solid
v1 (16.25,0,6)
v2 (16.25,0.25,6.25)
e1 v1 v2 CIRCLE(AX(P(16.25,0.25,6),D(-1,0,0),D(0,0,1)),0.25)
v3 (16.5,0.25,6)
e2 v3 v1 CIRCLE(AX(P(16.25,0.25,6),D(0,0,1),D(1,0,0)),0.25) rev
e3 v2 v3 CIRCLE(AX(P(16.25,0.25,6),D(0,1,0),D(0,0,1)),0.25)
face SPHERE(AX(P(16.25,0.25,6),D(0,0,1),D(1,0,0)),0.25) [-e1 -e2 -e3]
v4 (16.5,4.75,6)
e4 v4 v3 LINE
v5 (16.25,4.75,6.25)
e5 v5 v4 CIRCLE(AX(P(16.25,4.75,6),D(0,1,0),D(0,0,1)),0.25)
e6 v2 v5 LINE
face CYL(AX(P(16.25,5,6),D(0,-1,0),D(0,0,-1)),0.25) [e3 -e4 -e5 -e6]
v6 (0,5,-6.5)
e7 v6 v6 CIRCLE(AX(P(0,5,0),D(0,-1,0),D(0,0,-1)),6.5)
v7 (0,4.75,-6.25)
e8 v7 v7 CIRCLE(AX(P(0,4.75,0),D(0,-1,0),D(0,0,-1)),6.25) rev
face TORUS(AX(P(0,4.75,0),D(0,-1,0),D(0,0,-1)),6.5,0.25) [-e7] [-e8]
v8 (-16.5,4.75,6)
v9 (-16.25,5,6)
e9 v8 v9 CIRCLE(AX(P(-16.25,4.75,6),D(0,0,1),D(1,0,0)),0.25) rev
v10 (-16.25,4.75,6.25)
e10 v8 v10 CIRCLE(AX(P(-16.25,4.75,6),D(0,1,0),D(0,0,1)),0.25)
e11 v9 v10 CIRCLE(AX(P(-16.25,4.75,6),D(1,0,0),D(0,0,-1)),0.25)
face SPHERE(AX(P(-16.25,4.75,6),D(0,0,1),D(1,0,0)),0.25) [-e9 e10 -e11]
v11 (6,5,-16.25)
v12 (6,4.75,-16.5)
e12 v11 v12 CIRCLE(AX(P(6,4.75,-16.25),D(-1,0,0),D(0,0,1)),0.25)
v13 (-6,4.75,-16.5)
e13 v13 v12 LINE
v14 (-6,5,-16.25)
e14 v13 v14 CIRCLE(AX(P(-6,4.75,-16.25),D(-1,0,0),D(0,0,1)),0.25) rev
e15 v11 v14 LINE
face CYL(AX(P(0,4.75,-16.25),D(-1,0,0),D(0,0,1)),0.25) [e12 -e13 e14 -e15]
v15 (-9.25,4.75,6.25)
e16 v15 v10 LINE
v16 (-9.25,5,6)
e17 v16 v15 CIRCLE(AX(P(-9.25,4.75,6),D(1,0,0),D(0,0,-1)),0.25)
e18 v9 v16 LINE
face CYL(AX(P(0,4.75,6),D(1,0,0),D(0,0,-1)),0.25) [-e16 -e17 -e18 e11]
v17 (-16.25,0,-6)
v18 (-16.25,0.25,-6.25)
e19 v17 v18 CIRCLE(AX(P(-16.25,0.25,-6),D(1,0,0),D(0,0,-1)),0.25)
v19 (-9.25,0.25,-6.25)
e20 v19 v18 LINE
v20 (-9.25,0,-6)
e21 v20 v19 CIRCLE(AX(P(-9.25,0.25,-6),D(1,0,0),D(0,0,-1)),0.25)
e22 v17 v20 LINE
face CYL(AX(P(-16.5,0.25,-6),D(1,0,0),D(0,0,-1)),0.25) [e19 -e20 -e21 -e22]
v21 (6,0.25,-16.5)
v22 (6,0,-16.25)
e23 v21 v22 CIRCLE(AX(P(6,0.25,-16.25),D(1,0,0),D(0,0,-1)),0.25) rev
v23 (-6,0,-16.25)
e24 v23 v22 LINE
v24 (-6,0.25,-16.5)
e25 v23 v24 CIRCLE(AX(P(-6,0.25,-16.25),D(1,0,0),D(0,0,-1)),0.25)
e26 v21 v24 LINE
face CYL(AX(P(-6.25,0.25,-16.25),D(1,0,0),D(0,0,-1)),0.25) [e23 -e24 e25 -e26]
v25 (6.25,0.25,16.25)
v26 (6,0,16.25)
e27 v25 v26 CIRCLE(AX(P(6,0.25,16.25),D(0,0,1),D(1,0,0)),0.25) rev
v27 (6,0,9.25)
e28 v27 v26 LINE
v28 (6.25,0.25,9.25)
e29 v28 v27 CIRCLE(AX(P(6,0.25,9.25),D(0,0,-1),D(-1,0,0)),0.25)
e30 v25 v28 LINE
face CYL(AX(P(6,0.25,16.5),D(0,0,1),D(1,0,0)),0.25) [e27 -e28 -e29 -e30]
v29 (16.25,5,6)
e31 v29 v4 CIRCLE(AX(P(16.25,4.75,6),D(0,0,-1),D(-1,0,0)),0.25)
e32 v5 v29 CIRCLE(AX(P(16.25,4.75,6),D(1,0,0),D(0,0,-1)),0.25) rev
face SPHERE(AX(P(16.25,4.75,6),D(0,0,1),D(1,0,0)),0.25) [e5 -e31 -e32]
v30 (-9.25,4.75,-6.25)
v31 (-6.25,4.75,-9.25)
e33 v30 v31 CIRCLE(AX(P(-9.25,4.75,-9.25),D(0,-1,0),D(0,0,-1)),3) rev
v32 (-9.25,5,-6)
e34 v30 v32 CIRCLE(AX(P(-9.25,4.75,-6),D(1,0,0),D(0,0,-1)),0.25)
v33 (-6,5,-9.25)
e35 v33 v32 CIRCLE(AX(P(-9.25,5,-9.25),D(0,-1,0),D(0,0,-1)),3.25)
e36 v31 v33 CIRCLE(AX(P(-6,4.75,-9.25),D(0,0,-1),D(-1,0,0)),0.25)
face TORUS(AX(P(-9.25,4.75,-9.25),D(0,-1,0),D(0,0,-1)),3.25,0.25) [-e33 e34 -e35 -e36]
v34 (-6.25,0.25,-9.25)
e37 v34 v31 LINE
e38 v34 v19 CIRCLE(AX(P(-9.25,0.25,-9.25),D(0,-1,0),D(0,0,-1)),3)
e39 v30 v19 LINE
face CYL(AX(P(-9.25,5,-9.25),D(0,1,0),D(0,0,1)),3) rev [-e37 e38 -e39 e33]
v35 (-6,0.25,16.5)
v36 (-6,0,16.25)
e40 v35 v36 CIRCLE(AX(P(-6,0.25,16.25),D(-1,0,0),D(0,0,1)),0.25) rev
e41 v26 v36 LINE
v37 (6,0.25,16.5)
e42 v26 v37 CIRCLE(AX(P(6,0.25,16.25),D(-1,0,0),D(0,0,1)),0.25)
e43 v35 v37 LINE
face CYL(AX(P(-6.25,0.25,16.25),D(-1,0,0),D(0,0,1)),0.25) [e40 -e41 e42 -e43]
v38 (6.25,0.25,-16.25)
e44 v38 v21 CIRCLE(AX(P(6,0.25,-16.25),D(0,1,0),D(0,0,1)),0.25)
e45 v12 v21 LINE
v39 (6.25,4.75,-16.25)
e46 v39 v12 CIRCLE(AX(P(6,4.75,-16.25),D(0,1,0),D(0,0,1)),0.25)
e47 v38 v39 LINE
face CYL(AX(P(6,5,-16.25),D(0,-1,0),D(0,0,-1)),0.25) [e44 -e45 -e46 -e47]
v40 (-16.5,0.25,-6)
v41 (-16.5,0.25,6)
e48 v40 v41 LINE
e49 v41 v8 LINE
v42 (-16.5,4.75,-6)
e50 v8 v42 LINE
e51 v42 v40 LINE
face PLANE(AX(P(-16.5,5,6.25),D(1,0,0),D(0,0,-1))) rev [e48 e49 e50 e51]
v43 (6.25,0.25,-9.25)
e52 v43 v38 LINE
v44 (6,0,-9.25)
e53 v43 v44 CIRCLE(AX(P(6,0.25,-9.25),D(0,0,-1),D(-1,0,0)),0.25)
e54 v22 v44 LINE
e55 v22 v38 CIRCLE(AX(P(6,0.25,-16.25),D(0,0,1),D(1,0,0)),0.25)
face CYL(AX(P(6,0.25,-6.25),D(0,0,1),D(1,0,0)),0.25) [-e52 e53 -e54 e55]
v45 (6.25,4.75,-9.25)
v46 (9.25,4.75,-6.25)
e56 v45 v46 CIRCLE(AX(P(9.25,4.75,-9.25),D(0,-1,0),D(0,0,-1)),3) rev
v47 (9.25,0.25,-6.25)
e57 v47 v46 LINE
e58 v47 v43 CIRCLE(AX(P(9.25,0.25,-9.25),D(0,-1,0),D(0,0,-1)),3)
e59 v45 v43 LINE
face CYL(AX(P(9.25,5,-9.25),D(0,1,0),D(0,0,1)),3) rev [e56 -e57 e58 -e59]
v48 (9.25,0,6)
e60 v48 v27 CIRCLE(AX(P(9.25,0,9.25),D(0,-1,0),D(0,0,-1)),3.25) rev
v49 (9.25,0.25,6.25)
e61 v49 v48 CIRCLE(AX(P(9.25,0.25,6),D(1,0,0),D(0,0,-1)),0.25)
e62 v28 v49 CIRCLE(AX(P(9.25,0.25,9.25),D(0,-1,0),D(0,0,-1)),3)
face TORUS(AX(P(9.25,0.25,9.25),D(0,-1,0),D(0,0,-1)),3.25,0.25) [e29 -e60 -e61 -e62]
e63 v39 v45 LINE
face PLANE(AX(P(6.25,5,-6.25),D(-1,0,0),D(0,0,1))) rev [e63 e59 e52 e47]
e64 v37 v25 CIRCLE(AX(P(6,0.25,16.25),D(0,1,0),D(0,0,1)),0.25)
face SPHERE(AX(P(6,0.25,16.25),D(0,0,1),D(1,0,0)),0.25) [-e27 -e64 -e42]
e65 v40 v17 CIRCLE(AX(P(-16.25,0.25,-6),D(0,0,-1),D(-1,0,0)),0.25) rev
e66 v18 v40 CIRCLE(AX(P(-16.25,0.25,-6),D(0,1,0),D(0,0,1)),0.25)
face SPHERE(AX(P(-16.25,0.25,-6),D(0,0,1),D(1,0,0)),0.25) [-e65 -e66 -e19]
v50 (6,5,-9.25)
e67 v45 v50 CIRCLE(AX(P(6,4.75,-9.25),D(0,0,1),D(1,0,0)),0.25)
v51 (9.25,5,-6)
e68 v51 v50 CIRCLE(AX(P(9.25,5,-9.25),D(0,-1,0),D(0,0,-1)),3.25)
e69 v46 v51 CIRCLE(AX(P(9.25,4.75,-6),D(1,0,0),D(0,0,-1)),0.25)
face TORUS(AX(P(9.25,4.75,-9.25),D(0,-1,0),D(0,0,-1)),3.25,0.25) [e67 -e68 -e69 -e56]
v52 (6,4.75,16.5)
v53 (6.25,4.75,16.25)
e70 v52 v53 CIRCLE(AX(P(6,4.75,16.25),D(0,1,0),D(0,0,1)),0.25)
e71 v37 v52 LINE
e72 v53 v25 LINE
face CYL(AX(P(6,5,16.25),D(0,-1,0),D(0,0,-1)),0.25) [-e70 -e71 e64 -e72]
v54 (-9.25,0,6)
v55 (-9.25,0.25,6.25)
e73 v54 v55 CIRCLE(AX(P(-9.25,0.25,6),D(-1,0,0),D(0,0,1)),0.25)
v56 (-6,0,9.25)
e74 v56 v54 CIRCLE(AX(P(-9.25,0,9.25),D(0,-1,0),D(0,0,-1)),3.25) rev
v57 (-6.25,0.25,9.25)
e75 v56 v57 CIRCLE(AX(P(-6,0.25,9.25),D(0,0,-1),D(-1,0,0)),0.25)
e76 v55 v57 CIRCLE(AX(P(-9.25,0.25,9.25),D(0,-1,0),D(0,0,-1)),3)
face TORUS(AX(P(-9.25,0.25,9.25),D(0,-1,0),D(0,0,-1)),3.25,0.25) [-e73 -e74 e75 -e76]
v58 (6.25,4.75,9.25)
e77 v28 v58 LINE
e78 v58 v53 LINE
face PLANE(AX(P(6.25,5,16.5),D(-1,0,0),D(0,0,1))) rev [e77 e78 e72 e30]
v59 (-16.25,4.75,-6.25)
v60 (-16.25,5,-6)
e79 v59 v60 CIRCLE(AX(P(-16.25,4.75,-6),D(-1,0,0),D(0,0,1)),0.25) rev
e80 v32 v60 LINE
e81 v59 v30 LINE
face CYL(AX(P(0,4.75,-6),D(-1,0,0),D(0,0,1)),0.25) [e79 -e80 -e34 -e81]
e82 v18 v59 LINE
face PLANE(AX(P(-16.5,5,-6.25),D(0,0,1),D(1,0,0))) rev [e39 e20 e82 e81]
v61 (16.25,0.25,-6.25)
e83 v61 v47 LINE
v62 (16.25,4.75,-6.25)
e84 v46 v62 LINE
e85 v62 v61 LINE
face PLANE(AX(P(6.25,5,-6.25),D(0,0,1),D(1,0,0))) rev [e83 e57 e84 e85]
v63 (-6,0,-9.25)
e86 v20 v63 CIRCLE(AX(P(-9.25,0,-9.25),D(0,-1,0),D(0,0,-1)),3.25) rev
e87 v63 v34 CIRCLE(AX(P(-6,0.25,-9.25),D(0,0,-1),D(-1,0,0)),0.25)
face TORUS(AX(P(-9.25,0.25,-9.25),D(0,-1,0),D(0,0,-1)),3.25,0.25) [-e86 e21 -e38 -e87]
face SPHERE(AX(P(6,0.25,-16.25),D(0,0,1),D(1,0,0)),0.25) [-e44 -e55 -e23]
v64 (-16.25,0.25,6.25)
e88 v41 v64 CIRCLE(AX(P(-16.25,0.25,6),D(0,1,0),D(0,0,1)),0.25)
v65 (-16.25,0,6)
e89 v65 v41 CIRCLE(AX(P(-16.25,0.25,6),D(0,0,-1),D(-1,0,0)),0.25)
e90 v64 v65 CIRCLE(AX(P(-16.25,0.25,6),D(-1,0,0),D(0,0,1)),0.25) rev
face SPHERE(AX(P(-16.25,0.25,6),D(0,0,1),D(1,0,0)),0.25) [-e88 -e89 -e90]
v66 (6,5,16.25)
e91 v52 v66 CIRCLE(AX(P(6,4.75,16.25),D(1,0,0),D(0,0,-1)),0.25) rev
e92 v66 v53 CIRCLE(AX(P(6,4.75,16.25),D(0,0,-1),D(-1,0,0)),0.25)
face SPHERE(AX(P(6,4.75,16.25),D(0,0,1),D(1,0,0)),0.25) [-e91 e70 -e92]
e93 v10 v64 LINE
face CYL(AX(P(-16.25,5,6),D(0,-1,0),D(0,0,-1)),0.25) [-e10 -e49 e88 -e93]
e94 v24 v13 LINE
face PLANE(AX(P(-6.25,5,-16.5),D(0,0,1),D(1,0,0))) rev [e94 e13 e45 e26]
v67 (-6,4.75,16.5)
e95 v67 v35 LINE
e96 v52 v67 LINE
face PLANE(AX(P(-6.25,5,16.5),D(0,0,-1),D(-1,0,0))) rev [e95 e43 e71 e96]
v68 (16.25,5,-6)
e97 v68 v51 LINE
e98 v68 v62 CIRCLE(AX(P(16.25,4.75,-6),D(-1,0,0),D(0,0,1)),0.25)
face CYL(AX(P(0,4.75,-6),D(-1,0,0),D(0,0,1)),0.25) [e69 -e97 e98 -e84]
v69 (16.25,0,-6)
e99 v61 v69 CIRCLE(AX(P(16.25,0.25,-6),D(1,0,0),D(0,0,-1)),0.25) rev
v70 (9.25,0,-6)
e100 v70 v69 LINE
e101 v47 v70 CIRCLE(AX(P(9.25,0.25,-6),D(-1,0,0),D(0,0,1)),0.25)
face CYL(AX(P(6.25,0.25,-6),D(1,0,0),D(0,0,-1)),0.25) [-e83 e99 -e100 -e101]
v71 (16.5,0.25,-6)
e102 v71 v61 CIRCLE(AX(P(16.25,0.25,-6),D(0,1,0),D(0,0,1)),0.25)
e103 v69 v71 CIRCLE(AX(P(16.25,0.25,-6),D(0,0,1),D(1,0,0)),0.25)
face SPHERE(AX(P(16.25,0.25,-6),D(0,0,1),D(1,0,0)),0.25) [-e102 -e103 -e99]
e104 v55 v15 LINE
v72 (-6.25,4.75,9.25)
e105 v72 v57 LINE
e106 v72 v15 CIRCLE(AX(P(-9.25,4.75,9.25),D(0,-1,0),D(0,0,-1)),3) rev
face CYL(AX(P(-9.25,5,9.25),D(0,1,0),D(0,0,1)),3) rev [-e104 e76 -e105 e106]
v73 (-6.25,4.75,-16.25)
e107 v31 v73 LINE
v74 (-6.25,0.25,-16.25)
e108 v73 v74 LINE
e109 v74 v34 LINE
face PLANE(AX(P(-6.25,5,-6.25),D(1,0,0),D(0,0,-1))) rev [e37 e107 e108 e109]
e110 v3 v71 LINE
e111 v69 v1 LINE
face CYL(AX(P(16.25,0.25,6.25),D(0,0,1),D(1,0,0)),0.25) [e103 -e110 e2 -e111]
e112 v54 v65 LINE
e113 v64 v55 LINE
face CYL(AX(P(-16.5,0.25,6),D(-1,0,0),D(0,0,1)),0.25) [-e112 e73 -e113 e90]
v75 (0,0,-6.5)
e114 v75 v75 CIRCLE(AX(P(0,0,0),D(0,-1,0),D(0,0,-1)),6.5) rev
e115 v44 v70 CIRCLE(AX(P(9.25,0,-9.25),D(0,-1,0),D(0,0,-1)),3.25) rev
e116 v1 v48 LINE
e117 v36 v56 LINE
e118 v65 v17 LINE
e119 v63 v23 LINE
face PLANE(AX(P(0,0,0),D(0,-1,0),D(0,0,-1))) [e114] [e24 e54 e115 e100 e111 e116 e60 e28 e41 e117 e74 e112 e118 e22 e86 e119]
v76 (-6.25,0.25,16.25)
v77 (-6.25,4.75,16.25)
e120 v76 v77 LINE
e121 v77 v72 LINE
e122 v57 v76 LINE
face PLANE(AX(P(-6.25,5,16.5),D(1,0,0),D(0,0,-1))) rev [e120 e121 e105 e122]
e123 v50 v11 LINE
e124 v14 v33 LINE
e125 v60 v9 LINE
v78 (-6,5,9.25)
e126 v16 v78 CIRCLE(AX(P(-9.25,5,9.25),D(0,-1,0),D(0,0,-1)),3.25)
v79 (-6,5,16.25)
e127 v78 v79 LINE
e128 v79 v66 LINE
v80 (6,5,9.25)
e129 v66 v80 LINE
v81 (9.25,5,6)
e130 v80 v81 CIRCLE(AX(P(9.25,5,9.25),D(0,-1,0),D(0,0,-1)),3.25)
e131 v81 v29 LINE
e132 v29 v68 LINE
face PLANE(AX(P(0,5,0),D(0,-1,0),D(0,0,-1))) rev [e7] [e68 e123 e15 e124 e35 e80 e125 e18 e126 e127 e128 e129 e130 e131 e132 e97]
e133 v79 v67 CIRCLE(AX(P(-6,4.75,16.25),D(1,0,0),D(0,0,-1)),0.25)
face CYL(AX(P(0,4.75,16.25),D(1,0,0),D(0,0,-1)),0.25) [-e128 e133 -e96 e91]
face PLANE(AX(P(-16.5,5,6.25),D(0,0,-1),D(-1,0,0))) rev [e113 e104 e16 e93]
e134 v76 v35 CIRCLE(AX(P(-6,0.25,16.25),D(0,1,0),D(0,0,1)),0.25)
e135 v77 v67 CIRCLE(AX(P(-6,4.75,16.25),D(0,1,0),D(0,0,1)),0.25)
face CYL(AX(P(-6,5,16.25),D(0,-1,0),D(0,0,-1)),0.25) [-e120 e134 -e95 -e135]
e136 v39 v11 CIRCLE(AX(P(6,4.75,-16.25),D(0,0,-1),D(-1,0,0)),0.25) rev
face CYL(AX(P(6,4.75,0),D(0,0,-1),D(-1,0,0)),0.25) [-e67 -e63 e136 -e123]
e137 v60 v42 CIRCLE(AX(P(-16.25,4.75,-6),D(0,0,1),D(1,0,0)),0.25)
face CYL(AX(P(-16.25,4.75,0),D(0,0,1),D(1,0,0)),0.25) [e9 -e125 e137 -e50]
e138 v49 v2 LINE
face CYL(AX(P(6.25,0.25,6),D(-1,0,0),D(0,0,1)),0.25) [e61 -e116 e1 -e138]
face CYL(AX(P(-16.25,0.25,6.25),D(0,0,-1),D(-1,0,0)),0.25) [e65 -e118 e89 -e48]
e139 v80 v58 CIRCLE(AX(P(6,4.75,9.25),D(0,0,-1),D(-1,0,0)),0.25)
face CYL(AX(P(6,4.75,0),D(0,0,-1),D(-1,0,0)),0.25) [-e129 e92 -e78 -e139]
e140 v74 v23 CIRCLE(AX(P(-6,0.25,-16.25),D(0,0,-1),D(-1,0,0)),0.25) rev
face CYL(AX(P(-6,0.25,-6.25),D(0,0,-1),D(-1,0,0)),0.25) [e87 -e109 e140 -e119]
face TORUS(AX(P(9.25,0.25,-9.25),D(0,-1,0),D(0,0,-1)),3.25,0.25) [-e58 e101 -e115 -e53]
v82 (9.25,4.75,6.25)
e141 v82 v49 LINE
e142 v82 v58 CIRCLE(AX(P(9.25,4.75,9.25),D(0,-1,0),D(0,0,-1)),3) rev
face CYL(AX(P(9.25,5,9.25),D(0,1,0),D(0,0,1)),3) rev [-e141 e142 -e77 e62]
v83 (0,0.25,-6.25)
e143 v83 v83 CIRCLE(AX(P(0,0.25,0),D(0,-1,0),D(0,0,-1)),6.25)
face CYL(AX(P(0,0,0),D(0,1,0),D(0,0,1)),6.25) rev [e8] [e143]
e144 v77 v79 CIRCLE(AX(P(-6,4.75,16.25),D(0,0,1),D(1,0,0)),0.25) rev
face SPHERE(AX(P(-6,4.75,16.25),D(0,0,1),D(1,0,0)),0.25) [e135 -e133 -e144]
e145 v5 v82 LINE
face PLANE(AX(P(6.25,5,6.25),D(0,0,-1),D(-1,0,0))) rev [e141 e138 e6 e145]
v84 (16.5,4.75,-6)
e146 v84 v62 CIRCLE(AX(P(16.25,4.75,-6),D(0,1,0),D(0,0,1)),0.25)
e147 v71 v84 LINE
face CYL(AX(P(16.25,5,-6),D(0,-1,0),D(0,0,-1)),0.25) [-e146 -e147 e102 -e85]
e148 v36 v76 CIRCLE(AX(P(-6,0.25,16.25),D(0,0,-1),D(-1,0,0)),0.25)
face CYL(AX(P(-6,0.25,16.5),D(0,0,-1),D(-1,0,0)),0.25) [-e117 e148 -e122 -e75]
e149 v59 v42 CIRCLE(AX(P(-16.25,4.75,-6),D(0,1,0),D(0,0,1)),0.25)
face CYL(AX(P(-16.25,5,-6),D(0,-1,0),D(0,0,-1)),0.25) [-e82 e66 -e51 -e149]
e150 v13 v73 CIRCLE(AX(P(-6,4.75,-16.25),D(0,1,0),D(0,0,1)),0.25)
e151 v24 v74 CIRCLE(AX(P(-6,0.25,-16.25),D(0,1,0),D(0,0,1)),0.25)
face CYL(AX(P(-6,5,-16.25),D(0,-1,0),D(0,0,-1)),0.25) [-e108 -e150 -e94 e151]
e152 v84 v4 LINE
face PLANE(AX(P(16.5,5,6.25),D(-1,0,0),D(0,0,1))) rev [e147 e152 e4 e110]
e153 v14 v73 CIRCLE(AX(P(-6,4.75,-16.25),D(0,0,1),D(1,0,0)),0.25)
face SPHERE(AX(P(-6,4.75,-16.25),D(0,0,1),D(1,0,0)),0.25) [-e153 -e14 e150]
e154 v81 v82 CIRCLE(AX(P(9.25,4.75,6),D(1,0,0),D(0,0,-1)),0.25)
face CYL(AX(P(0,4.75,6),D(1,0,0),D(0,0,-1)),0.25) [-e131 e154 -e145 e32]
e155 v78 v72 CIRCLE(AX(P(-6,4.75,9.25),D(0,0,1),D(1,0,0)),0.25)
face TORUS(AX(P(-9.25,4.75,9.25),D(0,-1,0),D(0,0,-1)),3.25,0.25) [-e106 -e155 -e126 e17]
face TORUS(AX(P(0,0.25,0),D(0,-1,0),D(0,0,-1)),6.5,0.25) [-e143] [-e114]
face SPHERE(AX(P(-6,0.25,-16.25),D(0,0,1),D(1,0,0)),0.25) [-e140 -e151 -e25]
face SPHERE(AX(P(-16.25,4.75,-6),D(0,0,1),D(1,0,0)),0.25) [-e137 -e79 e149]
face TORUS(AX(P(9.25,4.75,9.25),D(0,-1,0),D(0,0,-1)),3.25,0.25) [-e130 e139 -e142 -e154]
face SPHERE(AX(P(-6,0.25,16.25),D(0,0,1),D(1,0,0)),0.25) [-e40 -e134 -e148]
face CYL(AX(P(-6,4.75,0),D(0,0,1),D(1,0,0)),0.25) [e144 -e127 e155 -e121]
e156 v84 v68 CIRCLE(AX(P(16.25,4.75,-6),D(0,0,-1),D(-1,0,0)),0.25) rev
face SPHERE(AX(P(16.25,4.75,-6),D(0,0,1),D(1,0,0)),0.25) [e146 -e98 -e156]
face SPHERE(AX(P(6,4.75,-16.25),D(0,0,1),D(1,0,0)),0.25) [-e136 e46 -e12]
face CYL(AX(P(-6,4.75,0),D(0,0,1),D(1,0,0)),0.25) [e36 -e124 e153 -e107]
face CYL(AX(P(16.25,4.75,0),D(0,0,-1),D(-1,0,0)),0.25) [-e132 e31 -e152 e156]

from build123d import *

# Parameters (mm, degrees)
EXTRUDE_1_DEPTH     = 5
SKETCH_2_R          = 6.25
CUT_EXTRUDE_1_DEPTH = 5
FILLET_1_R          = 3
FILLET_2_R          = 0.25
FILLET_3_R          = 0.25


with BuildPart() as part:
    # 草图1 → 凸台-拉伸1 (new body)
    with BuildSketch(Plane(origin=(0, 0, 0), x_dir=(1, 0, 0), z_dir=(0, 1, 0))):
        Polygon((6.25, 6.25), (16.5, 6.25), (16.5, -6.25), (6.25, -6.25), (6.25, -16.5), (-6.25, -16.5), (-6.25, -6.25), (-16.5, -6.25), (-16.5, 6.25), (-6.25, 6.25), (-6.25, 16.5), (6.25, 16.5), align=None)
    extrude(amount=EXTRUDE_1_DEPTH)

    # 草图2 → 切除-拉伸1 (cut)
    with BuildSketch(Plane(origin=(0, 5, 0), x_dir=(1, 0, 0), z_dir=(0, 1, 0))):
        with Locations(Location((0, 0, 0), (0, 0, 270))):
            Circle(SKETCH_2_R)
    extrude(amount=-CUT_EXTRUDE_1_DEPTH, mode=Mode.SUBTRACT)

    # 圆角1
    fillet_1_edges = [part.edges().sort_by_distance(p)[0] for p in [
        (6.25, 2.5, -6.25),
        (6.25, 2.5, 6.25),
        (-6.25, 2.5, 6.25),
        (-6.25, 2.5, -6.25),
    ]]
    fillet(fillet_1_edges, radius=FILLET_1_R)

    # 圆角2
    fillet_2_edges = [part.edges().sort_by_distance(p)[0] for p in [
        (12.875, 0, -6.25),
        (16.5, 0, 0),
        (-6.25, 5, -12.875),
        (6.25, 0, 12.875),
        (0, 0, 16.5),
        (-12.875, 0, 6.25),
        (-16.5, 0, 0),
        (-6.25, 0, -12.875),
        (0, 0, -16.5),
        (-16.5, 5, 0),
        (-12.875, 5, 6.25),
        (0, 5, 16.5),
        (6.25, 5, 12.875),
        (0, 0, -6.25),
        (0, 5, -6.25),
        (12.875, 0, 6.25),
        (12.875, 5, 6.25),
        (-6.25, 0, 12.875),
        (-6.25, 5, 12.875),
        (16.5, 5, 0),
        (-12.875, 0, -6.25),
        (-12.875, 5, -6.25),
        (6.25, 0, -12.875),
        (6.25, 5, -12.875),
        (12.875, 5, -6.25),
        (7.128679656, 0, 7.128679656),
        (7.128679656, 5, 7.128679656),
        (-7.128679656, 0, 7.128679656),
        (-7.128679656, 5, 7.128679656),
        (-7.128679656, 0, -7.128679656),
        (-7.128679656, 5, -7.128679656),
        (7.128679656, 0, -7.128679656),
        (7.128679656, 5, -7.128679656),
        (0, 5, -16.5),
    ]]
    fillet(fillet_2_edges, radius=FILLET_2_R)

    # 圆角3
    # the kernel refuses this fillet: 0.25 mm, written as the material it takes off along each edge
    with BuildSketch(Plane(origin=(6, 0.25, 16.25), x_dir=(0, 0, 1), z_dir=(1, 0, 0))) as fillet_3_piece_1_section:
        Polygon((0, 0), (FILLET_3_R, 0), (FILLET_3_R, FILLET_3_R), (0, FILLET_3_R), align=None)
    fillet_3_piece_1 = extrude(amount=FILLET_3_R, mode=Mode.PRIVATE)
    fillet_3_piece_1 = fillet_3_piece_1 - Plane(origin=(6, 0.25, 16.25), x_dir=(0, 0.7071067811865475, -0.7071067811865475), z_dir=(1, 0, 0)) * Sphere(FILLET_3_R, mode=Mode.PRIVATE)
    add(fillet_3_piece_1, mode=Mode.SUBTRACT)
    with BuildSketch(Plane(origin=(-6, 0.25, 16.25), x_dir=(-1, 0, 0), z_dir=(0, 0, 1))) as fillet_3_piece_2_section:
        Polygon((0, 0), (FILLET_3_R, 0), (FILLET_3_R, FILLET_3_R), (0, FILLET_3_R), align=None)
    fillet_3_piece_2 = extrude(amount=FILLET_3_R, mode=Mode.PRIVATE)
    fillet_3_piece_2 = fillet_3_piece_2 - Plane(origin=(-6, 0.25, 16.25), x_dir=(0.7071067811865475, 0.7071067811865475, 0), z_dir=(0, 0, 1)) * Sphere(FILLET_3_R, mode=Mode.PRIVATE)
    add(fillet_3_piece_2, mode=Mode.SUBTRACT)
    with BuildSketch(Plane(origin=(16.25, 0.25, 6), x_dir=(0, 0, 1), z_dir=(1, 0, 0))) as fillet_3_piece_3_section:
        Polygon((0, 0), (FILLET_3_R, 0), (FILLET_3_R, FILLET_3_R), (0, FILLET_3_R), align=None)
    fillet_3_piece_3 = extrude(amount=FILLET_3_R, mode=Mode.PRIVATE)
    fillet_3_piece_3 = fillet_3_piece_3 - Plane(origin=(16.25, 0.25, 6), x_dir=(0, 0.7071067811865475, -0.7071067811865475), z_dir=(1, 0, 0)) * Sphere(FILLET_3_R, mode=Mode.PRIVATE)
    add(fillet_3_piece_3, mode=Mode.SUBTRACT)
    with BuildSketch(Plane(origin=(-16.25, 0.25, 6), x_dir=(0, 0, 1), z_dir=(-1, 0, 0))) as fillet_3_piece_4_section:
        Polygon((0, 0), (FILLET_3_R, 0), (FILLET_3_R, -FILLET_3_R), (0, -FILLET_3_R), align=None)
    fillet_3_piece_4 = extrude(amount=FILLET_3_R, mode=Mode.PRIVATE)
    fillet_3_piece_4 = fillet_3_piece_4 - Plane(origin=(-16.25, 0.25, 6), x_dir=(0, 0.7071067811865475, -0.7071067811865475), z_dir=(-1, 0, 0)) * Sphere(FILLET_3_R, mode=Mode.PRIVATE)
    add(fillet_3_piece_4, mode=Mode.SUBTRACT)
    with BuildSketch(Plane(origin=(16.25, 0.25, -6), x_dir=(1, 0, 0), z_dir=(0, 0, -1))) as fillet_3_piece_5_section:
        Polygon((0, 0), (FILLET_3_R, 0), (FILLET_3_R, FILLET_3_R), (0, FILLET_3_R), align=None)
    fillet_3_piece_5 = extrude(amount=FILLET_3_R, mode=Mode.PRIVATE)
    fillet_3_piece_5 = fillet_3_piece_5 - Plane(origin=(16.25, 0.25, -6), x_dir=(-0.7071067811865475, 0.7071067811865475, 0), z_dir=(0, 0, -1)) * Sphere(FILLET_3_R, mode=Mode.PRIVATE)
    add(fillet_3_piece_5, mode=Mode.SUBTRACT)
    with BuildSketch(Plane(origin=(-16.25, 0.25, -6), x_dir=(-1, 0, 0), z_dir=(0, 0, -1))) as fillet_3_piece_6_section:
        Polygon((0, 0), (FILLET_3_R, 0), (FILLET_3_R, -FILLET_3_R), (0, -FILLET_3_R), align=None)
    fillet_3_piece_6 = extrude(amount=FILLET_3_R, mode=Mode.PRIVATE)
    fillet_3_piece_6 = fillet_3_piece_6 - Plane(origin=(-16.25, 0.25, -6), x_dir=(0.7071067811865475, 0.7071067811865475, 0), z_dir=(0, 0, -1)) * Sphere(FILLET_3_R, mode=Mode.PRIVATE)
    add(fillet_3_piece_6, mode=Mode.SUBTRACT)
    with BuildSketch(Plane(origin=(6, 0.25, -16.25), x_dir=(0, 0, -1), z_dir=(1, 0, 0))) as fillet_3_piece_7_section:
        Polygon((0, 0), (FILLET_3_R, 0), (FILLET_3_R, -FILLET_3_R), (0, -FILLET_3_R), align=None)
    fillet_3_piece_7 = extrude(amount=FILLET_3_R, mode=Mode.PRIVATE)
    fillet_3_piece_7 = fillet_3_piece_7 - Plane(origin=(6, 0.25, -16.25), x_dir=(0, 0.7071067811865475, 0.7071067811865475), z_dir=(1, 0, 0)) * Sphere(FILLET_3_R, mode=Mode.PRIVATE)
    add(fillet_3_piece_7, mode=Mode.SUBTRACT)
    with BuildSketch(Plane(origin=(-6, 0.25, -16.25), x_dir=(-1, 0, 0), z_dir=(0, 0, -1))) as fillet_3_piece_8_section:
        Polygon((0, 0), (FILLET_3_R, 0), (FILLET_3_R, -FILLET_3_R), (0, -FILLET_3_R), align=None)
    fillet_3_piece_8 = extrude(amount=FILLET_3_R, mode=Mode.PRIVATE)
    fillet_3_piece_8 = fillet_3_piece_8 - Plane(origin=(-6, 0.25, -16.25), x_dir=(0.7071067811865475, 0.7071067811865475, 0), z_dir=(0, 0, -1)) * Sphere(FILLET_3_R, mode=Mode.PRIVATE)
    add(fillet_3_piece_8, mode=Mode.SUBTRACT)
    with BuildSketch(Plane(origin=(-16.25, 4.75, 6), x_dir=(0, 0, 1), z_dir=(-1, 0, 0))) as fillet_3_piece_9_section:
        Polygon((0, 0), (FILLET_3_R, 0), (FILLET_3_R, FILLET_3_R), (0, FILLET_3_R), align=None)
    fillet_3_piece_9 = extrude(amount=FILLET_3_R, mode=Mode.PRIVATE)
    fillet_3_piece_9 = fillet_3_piece_9 - Plane(origin=(-16.25, 4.75, 6), x_dir=(0, -0.7071067811865475, -0.7071067811865475), z_dir=(-1, 0, 0)) * Sphere(FILLET_3_R, mode=Mode.PRIVATE)
    add(fillet_3_piece_9, mode=Mode.SUBTRACT)
    with BuildSketch(Plane(origin=(-16.25, 4.75, -6), x_dir=(-1, 0, 0), z_dir=(0, 0, -1))) as fillet_3_piece_10_section:
        Polygon((0, 0), (FILLET_3_R, 0), (FILLET_3_R, FILLET_3_R), (0, FILLET_3_R), align=None)
    fillet_3_piece_10 = extrude(amount=FILLET_3_R, mode=Mode.PRIVATE)
    fillet_3_piece_10 = fillet_3_piece_10 - Plane(origin=(-16.25, 4.75, -6), x_dir=(0.7071067811865475, -0.7071067811865475, 0), z_dir=(0, 0, -1)) * Sphere(FILLET_3_R, mode=Mode.PRIVATE)
    add(fillet_3_piece_10, mode=Mode.SUBTRACT)
    with BuildSketch(Plane(origin=(-6, 4.75, 16.25), x_dir=(-1, 0, 0), z_dir=(0, 0, 1))) as fillet_3_piece_11_section:
        Polygon((0, 0), (FILLET_3_R, 0), (FILLET_3_R, -FILLET_3_R), (0, -FILLET_3_R), align=None)
    fillet_3_piece_11 = extrude(amount=FILLET_3_R, mode=Mode.PRIVATE)
    fillet_3_piece_11 = fillet_3_piece_11 - Plane(origin=(-6, 4.75, 16.25), x_dir=(0.7071067811865475, -0.7071067811865475, 0), z_dir=(0, 0, 1)) * Sphere(FILLET_3_R, mode=Mode.PRIVATE)
    add(fillet_3_piece_11, mode=Mode.SUBTRACT)
    with BuildSketch(Plane(origin=(-6, 4.75, -16.25), x_dir=(-1, 0, 0), z_dir=(0, 0, -1))) as fillet_3_piece_12_section:
        Polygon((0, 0), (FILLET_3_R, 0), (FILLET_3_R, FILLET_3_R), (0, FILLET_3_R), align=None)
    fillet_3_piece_12 = extrude(amount=FILLET_3_R, mode=Mode.PRIVATE)
    fillet_3_piece_12 = fillet_3_piece_12 - Plane(origin=(-6, 4.75, -16.25), x_dir=(0.7071067811865475, -0.7071067811865475, 0), z_dir=(0, 0, -1)) * Sphere(FILLET_3_R, mode=Mode.PRIVATE)
    add(fillet_3_piece_12, mode=Mode.SUBTRACT)
    with BuildSketch(Plane(origin=(6, 4.75, 16.25), x_dir=(0, 0, 1), z_dir=(1, 0, 0))) as fillet_3_piece_13_section:
        Polygon((0, 0), (FILLET_3_R, 0), (FILLET_3_R, -FILLET_3_R), (0, -FILLET_3_R), align=None)
    fillet_3_piece_13 = extrude(amount=FILLET_3_R, mode=Mode.PRIVATE)
    fillet_3_piece_13 = fillet_3_piece_13 - Plane(origin=(6, 4.75, 16.25), x_dir=(0, -0.7071067811865475, -0.7071067811865475), z_dir=(1, 0, 0)) * Sphere(FILLET_3_R, mode=Mode.PRIVATE)
    add(fillet_3_piece_13, mode=Mode.SUBTRACT)
    with BuildSketch(Plane(origin=(6, 4.75, -16.25), x_dir=(0, 0, -1), z_dir=(1, 0, 0))) as fillet_3_piece_14_section:
        Polygon((0, 0), (FILLET_3_R, 0), (FILLET_3_R, FILLET_3_R), (0, FILLET_3_R), align=None)
    fillet_3_piece_14 = extrude(amount=FILLET_3_R, mode=Mode.PRIVATE)
    fillet_3_piece_14 = fillet_3_piece_14 - Plane(origin=(6, 4.75, -16.25), x_dir=(0, -0.7071067811865475, 0.7071067811865475), z_dir=(1, 0, 0)) * Sphere(FILLET_3_R, mode=Mode.PRIVATE)
    add(fillet_3_piece_14, mode=Mode.SUBTRACT)
    with BuildSketch(Plane(origin=(16.25, 4.75, 6), x_dir=(0, 0, 1), z_dir=(1, 0, 0))) as fillet_3_piece_15_section:
        Polygon((0, 0), (FILLET_3_R, 0), (FILLET_3_R, -FILLET_3_R), (0, -FILLET_3_R), align=None)
    fillet_3_piece_15 = extrude(amount=FILLET_3_R, mode=Mode.PRIVATE)
    fillet_3_piece_15 = fillet_3_piece_15 - Plane(origin=(16.25, 4.75, 6), x_dir=(0, -0.7071067811865475, -0.7071067811865475), z_dir=(1, 0, 0)) * Sphere(FILLET_3_R, mode=Mode.PRIVATE)
    add(fillet_3_piece_15, mode=Mode.SUBTRACT)
    with BuildSketch(Plane(origin=(16.25, 4.75, -6), x_dir=(1, 0, 0), z_dir=(0, 0, -1))) as fillet_3_piece_16_section:
        Polygon((0, 0), (FILLET_3_R, 0), (FILLET_3_R, -FILLET_3_R), (0, -FILLET_3_R), align=None)
    fillet_3_piece_16 = extrude(amount=FILLET_3_R, mode=Mode.PRIVATE)
    fillet_3_piece_16 = fillet_3_piece_16 - Plane(origin=(16.25, 4.75, -6), x_dir=(-0.7071067811865475, -0.7071067811865475, 0), z_dir=(0, 0, -1)) * Sphere(FILLET_3_R, mode=Mode.PRIVATE)
    add(fillet_3_piece_16, mode=Mode.SUBTRACT)
    with BuildSketch(Plane(origin=(-6.25, 0.25, -16.5), x_dir=(1, 0, 0), z_dir=(0, 1, 0)), Plane(origin=(6.25, 0.25, -16.5), x_dir=(0, 0, 1), z_dir=(0, 1, 0)), Plane(origin=(-16.5, 0.25, -6.25), x_dir=(1, 0, 0), z_dir=(0, 1, 0)), Plane(origin=(-16.5, 0.25, 6.25), x_dir=(0, 0, -1), z_dir=(0, 1, 0))) as fillet_3_piece_17:
        with BuildLine():
            CenterArc((FILLET_3_R, -FILLET_3_R), FILLET_3_R, 90, 90)
            Line((0, -FILLET_3_R), (0, 0))
            Line((0, 0), (FILLET_3_R, 0))
        make_face()
    extrude(amount=4.5, mode=Mode.SUBTRACT)
    with BuildSketch(Plane(origin=(-6.25, 0.25, 16.5), x_dir=(1, 0, 0), z_dir=(0, 1, 0)), Plane(origin=(6.25, 0.25, 16.5), x_dir=(0, 0, -1), z_dir=(0, 1, 0)), Plane(origin=(16.5, 0.25, 6.25), x_dir=(0, 0, -1), z_dir=(0, 1, 0)), Plane(origin=(16.5, 0.25, -6.25), x_dir=(-1, 0, 0), z_dir=(0, 1, 0))) as fillet_3_piece_18:
        with BuildLine():
            CenterArc((FILLET_3_R, FILLET_3_R), FILLET_3_R, 180, 90)
            Line((0, FILLET_3_R), (0, 0))
            Line((0, 0), (FILLET_3_R, 0))
        make_face()
    extrude(amount=4.5, mode=Mode.SUBTRACT)


solid = part.part
